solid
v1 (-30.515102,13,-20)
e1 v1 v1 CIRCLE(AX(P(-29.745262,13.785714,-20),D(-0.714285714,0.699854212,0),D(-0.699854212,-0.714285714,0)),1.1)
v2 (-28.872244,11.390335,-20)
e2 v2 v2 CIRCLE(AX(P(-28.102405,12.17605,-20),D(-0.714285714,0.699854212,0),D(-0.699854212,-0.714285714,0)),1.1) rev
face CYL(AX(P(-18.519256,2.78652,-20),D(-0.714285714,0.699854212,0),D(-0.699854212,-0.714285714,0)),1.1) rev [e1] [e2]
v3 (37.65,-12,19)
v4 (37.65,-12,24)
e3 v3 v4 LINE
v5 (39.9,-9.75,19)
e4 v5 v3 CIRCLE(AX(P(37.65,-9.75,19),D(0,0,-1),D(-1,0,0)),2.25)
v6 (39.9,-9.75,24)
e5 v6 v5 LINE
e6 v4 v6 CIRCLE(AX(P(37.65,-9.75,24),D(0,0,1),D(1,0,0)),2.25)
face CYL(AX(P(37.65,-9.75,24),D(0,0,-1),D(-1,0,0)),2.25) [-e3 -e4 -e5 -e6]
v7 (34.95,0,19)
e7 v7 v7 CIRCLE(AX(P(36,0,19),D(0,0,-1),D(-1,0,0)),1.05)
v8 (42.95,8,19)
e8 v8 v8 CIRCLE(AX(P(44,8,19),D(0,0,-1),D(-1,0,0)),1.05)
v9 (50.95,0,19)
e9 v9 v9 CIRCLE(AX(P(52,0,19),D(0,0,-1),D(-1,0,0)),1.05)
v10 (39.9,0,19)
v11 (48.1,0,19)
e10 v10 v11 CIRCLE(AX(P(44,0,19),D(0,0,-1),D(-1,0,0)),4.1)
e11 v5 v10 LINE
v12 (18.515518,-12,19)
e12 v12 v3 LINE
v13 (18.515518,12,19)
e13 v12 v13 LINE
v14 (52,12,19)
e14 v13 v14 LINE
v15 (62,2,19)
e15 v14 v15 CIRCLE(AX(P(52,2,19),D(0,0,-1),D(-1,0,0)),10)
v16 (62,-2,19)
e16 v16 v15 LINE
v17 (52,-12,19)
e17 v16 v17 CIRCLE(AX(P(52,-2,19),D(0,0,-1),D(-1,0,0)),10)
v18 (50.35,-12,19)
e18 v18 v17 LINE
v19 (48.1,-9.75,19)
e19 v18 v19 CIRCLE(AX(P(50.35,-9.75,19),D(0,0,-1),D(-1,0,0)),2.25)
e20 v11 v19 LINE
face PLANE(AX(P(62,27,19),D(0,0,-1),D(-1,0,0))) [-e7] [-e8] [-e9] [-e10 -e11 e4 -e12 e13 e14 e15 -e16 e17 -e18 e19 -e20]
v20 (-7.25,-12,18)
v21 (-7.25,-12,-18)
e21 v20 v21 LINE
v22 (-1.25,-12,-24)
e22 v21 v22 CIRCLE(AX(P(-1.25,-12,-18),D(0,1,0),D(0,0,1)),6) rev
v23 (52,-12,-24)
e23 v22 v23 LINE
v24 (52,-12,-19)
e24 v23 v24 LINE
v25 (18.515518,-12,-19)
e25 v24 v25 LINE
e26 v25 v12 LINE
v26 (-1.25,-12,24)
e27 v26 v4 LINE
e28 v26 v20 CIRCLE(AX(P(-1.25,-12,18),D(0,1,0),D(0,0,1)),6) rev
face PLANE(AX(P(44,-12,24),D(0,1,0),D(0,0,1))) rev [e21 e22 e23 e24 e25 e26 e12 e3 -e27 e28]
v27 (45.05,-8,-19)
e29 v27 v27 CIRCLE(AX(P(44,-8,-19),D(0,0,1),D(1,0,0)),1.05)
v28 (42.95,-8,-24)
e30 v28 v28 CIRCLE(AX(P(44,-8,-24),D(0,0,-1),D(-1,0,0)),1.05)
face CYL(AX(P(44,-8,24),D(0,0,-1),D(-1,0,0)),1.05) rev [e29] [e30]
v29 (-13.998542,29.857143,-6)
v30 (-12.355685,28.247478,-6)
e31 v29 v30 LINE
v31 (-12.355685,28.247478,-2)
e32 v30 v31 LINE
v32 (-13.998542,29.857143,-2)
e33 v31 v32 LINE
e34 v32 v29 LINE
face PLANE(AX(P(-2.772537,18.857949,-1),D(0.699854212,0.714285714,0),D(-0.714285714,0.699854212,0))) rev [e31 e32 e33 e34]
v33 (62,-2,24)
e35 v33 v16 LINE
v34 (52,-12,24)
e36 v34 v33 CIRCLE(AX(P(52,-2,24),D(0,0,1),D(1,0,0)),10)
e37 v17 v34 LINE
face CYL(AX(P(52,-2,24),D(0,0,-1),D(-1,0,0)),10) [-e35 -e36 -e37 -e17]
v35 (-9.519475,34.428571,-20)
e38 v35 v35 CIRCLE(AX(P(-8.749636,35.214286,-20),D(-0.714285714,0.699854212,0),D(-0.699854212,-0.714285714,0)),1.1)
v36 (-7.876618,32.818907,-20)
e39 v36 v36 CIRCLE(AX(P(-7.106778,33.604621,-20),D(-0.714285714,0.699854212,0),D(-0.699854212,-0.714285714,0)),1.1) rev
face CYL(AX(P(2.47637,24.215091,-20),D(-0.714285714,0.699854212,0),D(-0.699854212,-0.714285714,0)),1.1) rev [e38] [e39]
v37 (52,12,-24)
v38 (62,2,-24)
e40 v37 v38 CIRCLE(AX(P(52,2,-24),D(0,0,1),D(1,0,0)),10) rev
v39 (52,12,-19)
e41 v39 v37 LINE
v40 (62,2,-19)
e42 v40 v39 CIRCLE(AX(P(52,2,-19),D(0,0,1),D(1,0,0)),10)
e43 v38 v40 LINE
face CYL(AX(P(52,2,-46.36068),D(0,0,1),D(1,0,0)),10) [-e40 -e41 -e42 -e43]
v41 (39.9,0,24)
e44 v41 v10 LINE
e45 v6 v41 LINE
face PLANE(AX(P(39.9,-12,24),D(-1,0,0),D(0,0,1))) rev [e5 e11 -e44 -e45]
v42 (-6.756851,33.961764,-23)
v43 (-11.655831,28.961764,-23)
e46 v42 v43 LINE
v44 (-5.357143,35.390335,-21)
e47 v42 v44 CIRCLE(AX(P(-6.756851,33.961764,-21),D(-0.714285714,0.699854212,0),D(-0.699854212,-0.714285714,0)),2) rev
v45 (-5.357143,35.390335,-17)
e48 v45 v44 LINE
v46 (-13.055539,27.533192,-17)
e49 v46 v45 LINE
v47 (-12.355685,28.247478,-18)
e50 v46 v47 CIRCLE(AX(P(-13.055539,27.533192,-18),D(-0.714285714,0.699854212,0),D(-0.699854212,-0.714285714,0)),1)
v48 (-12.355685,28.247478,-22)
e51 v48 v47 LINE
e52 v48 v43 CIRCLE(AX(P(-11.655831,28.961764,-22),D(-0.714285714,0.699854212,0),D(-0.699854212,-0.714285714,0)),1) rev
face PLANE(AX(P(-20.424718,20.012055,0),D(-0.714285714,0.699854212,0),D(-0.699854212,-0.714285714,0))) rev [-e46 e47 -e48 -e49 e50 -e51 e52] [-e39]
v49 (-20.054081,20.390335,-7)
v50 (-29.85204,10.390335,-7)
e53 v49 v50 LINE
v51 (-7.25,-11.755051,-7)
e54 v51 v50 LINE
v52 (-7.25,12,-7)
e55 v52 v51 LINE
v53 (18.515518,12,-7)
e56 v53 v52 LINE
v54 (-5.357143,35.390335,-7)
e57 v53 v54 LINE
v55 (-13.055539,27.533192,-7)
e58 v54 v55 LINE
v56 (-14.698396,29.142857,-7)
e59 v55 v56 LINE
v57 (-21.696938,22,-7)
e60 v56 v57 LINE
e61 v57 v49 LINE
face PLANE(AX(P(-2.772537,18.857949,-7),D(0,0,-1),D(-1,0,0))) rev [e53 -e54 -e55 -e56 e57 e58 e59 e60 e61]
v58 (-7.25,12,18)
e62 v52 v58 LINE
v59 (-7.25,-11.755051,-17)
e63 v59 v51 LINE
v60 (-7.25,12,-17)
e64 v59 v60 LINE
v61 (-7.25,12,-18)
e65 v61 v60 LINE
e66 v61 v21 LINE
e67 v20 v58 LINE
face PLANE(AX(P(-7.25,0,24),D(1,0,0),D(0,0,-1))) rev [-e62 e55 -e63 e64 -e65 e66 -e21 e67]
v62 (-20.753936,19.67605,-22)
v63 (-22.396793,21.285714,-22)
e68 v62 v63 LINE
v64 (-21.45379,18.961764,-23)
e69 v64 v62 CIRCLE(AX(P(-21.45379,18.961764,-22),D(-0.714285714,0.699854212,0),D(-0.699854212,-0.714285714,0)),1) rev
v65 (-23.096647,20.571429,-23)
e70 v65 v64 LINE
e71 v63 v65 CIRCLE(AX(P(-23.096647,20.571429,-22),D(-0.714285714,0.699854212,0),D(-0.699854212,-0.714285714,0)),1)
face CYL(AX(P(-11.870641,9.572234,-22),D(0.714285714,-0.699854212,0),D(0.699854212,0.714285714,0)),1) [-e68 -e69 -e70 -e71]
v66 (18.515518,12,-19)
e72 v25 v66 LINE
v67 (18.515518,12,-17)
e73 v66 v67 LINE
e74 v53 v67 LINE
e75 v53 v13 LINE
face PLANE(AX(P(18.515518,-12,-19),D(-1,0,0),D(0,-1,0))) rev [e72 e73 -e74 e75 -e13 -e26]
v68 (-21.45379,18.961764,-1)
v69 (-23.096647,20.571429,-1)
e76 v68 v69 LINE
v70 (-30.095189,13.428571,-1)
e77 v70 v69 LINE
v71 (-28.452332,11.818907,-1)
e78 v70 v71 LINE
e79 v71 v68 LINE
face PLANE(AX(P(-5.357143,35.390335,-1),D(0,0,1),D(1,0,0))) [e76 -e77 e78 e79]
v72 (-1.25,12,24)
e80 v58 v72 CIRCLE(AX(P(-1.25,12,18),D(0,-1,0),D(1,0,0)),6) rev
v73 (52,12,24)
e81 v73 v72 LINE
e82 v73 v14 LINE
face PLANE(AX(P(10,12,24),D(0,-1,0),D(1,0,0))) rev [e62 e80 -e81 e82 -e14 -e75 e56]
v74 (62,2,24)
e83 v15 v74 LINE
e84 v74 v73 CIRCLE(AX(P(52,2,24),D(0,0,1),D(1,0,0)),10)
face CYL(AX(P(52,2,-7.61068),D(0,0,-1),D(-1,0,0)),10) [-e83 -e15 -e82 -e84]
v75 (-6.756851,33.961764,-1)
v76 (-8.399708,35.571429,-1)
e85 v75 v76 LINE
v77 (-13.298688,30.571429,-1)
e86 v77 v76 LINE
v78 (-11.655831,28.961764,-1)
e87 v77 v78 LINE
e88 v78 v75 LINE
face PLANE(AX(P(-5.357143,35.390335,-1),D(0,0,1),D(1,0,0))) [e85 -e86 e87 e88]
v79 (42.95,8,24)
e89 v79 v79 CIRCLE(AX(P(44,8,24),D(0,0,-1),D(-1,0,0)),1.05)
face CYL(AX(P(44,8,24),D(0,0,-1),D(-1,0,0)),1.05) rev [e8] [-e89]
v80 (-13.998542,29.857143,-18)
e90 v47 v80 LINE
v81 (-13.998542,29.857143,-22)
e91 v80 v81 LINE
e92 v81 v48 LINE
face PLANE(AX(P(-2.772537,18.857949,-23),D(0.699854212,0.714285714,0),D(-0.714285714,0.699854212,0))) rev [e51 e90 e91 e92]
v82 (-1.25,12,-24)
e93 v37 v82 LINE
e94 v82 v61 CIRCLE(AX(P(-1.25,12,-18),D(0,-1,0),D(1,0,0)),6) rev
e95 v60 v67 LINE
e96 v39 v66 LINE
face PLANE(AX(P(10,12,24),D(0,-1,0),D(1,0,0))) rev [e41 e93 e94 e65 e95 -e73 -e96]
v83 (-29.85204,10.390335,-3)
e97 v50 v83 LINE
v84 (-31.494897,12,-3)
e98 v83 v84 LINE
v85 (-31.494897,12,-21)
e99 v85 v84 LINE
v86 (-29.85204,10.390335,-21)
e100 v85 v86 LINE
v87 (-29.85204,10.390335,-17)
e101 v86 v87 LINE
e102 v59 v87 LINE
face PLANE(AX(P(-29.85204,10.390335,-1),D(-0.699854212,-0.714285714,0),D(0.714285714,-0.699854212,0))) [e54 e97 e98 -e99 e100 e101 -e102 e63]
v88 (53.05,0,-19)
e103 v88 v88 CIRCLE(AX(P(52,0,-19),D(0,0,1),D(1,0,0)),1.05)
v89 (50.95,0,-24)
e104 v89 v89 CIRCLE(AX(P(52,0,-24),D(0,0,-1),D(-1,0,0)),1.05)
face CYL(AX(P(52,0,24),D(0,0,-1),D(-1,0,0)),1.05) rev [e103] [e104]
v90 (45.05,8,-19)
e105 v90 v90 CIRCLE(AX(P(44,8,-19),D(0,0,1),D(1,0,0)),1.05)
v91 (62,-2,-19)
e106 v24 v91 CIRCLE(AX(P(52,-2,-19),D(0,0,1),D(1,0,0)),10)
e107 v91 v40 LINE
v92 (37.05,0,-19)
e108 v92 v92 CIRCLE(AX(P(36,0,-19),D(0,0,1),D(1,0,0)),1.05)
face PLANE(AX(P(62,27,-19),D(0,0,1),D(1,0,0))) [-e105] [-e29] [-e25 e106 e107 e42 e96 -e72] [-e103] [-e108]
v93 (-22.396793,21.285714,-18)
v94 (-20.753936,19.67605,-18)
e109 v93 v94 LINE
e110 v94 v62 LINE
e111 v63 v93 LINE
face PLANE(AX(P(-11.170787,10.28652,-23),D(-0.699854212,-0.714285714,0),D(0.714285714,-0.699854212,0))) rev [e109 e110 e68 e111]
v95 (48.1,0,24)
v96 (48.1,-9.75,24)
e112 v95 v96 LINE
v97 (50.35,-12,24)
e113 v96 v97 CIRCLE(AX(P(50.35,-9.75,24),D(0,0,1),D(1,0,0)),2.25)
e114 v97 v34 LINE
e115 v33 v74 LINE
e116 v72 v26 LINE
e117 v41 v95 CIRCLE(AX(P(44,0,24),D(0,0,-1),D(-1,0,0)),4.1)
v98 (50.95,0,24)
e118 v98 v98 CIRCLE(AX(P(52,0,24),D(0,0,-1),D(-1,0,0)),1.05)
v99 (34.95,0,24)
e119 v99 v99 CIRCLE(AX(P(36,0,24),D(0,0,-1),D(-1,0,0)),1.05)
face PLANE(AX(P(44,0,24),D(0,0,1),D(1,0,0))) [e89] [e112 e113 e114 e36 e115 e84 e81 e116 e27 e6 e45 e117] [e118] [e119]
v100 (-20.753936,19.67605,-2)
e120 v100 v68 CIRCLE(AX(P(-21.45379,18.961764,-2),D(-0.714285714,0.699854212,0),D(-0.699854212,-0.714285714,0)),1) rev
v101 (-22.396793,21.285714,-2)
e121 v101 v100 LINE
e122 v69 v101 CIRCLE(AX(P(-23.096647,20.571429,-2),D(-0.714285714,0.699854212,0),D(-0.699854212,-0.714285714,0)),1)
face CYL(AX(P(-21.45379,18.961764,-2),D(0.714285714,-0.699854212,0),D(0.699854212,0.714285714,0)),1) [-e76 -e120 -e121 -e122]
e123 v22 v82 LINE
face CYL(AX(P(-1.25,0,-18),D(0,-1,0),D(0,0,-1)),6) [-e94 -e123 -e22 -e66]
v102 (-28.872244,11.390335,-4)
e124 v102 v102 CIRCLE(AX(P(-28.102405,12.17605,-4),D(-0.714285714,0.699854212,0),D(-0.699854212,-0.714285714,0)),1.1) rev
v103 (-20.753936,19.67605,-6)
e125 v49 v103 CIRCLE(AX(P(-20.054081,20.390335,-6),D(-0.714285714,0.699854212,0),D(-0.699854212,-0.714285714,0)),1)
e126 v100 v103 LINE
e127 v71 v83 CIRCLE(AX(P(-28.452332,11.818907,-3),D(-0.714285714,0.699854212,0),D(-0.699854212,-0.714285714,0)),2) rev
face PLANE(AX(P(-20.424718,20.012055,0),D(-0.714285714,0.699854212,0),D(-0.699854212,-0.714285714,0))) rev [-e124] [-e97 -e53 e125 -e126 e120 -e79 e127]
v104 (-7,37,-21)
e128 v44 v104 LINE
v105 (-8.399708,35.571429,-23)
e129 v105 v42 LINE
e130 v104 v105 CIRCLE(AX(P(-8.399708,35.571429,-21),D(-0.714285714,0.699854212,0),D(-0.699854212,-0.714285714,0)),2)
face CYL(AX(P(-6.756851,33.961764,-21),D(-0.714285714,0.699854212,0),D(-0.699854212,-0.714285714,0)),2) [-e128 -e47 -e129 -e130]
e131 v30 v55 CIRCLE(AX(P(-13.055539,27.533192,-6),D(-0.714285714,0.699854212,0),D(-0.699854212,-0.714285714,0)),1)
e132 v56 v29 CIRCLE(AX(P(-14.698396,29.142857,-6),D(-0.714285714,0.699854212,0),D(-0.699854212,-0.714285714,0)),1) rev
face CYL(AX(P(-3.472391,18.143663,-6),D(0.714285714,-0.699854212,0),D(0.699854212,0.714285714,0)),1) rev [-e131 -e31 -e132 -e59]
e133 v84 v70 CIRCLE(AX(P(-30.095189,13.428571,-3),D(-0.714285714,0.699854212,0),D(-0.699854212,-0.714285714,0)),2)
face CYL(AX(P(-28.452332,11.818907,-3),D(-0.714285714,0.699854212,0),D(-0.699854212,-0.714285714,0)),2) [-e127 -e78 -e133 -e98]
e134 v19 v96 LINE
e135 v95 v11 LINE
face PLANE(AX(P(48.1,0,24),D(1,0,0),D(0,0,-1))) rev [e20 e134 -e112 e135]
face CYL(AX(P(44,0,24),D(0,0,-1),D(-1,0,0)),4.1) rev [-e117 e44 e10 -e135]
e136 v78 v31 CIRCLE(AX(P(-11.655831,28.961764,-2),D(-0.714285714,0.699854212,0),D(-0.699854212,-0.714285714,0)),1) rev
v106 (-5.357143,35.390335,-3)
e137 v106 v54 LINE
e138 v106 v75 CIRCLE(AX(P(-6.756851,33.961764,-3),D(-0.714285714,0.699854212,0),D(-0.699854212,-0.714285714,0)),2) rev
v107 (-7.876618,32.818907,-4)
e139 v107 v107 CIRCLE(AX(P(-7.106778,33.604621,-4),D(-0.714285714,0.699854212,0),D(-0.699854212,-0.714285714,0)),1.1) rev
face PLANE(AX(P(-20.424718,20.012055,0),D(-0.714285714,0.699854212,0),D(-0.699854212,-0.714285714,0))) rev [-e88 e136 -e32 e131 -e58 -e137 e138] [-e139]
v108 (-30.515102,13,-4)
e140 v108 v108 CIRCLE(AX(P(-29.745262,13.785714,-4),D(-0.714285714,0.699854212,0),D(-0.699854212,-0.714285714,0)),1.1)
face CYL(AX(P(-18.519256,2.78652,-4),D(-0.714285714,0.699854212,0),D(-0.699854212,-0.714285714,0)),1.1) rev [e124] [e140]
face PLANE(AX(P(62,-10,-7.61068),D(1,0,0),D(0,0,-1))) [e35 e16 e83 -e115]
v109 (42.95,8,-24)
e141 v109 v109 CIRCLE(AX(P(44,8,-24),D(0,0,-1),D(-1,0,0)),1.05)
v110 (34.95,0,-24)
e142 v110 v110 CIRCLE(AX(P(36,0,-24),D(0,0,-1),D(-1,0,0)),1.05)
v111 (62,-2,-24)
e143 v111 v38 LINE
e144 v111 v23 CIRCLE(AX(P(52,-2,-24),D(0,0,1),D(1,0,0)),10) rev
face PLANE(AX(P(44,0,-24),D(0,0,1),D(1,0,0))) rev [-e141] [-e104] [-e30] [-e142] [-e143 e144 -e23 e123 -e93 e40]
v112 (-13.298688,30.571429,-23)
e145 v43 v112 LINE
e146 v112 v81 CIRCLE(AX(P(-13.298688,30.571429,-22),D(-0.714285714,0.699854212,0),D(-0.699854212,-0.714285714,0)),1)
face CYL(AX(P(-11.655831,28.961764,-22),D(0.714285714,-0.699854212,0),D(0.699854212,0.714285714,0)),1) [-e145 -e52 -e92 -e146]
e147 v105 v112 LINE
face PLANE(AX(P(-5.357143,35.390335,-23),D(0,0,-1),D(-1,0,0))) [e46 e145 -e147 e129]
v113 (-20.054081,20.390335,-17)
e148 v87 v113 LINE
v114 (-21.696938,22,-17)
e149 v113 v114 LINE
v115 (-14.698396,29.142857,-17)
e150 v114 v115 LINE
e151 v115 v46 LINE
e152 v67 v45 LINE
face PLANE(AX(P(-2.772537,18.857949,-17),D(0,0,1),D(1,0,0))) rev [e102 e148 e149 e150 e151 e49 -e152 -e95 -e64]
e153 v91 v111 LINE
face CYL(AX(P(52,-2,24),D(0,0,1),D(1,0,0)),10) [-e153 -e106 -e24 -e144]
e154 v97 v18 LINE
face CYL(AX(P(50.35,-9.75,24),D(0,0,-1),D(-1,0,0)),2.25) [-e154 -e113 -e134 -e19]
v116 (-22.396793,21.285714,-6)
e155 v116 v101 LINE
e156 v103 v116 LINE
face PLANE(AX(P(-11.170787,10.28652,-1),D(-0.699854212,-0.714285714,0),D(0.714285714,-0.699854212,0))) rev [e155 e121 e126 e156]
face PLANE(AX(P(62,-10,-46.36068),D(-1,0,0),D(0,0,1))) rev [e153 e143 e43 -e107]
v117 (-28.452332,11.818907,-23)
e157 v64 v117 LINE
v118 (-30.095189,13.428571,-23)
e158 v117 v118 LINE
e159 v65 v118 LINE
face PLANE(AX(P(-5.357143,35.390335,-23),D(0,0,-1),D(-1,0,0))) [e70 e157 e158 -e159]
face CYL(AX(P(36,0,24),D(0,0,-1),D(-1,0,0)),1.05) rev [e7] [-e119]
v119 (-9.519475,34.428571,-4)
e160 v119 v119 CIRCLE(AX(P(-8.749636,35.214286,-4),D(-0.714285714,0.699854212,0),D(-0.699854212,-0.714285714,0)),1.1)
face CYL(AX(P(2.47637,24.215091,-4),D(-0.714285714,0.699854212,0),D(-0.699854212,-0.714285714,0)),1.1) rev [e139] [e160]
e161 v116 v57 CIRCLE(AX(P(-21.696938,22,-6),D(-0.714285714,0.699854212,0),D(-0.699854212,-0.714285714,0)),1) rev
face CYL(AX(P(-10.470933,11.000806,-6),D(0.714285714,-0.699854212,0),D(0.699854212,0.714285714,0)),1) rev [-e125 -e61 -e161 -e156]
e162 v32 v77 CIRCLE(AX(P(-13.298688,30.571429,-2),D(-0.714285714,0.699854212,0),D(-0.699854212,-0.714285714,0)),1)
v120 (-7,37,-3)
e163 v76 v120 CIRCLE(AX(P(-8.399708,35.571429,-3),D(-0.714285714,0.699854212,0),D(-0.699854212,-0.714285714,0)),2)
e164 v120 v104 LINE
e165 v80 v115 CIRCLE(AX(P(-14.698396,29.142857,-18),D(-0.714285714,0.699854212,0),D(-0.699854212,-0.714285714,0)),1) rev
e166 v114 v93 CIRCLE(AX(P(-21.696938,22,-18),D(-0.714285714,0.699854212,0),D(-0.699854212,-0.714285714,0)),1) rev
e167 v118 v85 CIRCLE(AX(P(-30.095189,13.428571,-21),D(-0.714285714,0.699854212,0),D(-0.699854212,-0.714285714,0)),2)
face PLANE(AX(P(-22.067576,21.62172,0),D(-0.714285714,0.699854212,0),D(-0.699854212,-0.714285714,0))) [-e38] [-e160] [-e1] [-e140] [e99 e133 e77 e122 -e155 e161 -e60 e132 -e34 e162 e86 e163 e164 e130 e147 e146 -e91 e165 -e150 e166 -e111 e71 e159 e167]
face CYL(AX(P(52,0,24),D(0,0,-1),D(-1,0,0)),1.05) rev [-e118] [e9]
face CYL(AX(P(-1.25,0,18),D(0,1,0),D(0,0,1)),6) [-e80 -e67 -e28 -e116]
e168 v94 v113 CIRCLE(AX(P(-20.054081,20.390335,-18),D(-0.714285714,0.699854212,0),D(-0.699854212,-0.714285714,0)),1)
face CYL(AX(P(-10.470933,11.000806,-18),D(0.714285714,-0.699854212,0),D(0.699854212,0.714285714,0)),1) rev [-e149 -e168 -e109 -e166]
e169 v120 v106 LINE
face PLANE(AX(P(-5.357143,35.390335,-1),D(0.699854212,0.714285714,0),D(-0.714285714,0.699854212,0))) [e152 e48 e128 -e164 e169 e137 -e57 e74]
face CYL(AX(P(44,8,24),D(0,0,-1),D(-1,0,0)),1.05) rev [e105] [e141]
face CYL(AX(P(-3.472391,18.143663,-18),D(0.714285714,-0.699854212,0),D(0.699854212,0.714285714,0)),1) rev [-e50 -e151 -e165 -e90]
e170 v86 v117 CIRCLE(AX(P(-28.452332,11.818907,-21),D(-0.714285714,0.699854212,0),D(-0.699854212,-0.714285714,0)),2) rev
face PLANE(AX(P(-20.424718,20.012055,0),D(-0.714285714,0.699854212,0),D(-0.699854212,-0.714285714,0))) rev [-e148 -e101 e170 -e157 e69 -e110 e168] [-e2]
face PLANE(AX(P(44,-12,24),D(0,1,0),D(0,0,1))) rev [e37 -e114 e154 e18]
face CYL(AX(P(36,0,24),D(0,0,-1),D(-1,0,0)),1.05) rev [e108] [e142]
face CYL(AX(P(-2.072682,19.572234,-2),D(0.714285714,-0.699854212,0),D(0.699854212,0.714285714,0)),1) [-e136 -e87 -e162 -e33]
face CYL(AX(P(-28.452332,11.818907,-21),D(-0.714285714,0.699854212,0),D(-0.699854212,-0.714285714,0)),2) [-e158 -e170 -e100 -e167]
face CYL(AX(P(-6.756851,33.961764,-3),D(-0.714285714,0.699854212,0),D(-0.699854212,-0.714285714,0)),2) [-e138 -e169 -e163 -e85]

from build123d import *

# Parameters (mm, degrees)
EXTRUDE_1_DEPTH         = 24
SKETCH_2_W              = 24
SKETCH_2_H              = 29.5
CUT_EXTRUDE_1_DEPTH     = 79.714674617
SKETCH_3_R              = 1.1
CUT_EXTRUDE_2_DEPTH     = 96.205041883
SKETCH_4_W              = 15
SKETCH_4_H              = 48
EXTRUDE_2_DEPTH         = 52
SKETCH_5_W              = 35
SKETCH_5_H              = 13
CUT_EXTRUDE_3_DEPTH     = 52
SKETCH_6_W              = 35
SKETCH_6_H              = 20.5
CUT_EXTRUDE_4_DEPTH     = 11.5
SKETCH_7_W              = 35
SKETCH_7_H              = 19
CUT_EXTRUDE_5_DEPTH     = 37.5
SKETCH_8_R              = 1.1
CUT_EXTRUDE_6_DEPTH     = 3
CUT_EXTRUDE_7_DEPTH     = 96.205041883
SKETCH_10_W             = 35
SKETCH_10_H             = 22
CUT_EXTRUDE_8_DEPTH     = 11.5
SKETCH_11_W             = 12
SKETCH_11_H             = 6
CUT_EXTRUDE_9_DEPTH     = 3
FILLET_1_R              = 2
FILLET_2_R              = 1
SKETCH_14_R             = 0.75
CUT_EXTRUDE_12_DEPTH    = 8
SKETCH_17_R             = 1.9
CUT_EXTRUDE_13_DEPTH    = 1.4
SKETCH_26_W             = 65.219467354
SKETCH_26_H             = 31.879169378
CUT_EXTRUDE_17_DEPTH    = 2.75
CUT_EXTRUDE_18_DEPTH    = 0.7
SKETCH_28_R             = 4.45
EXTRUDE_11_DEPTH        = 8
EXTRUDE_12_REACH        = 89.179
SKETCH_29_W             = 35
SKETCH_29_H             = 48
SKETCH4_R               = 1.9
CUT_EXTRUDE3_DEPTH      = 1
BOSS_EXTRUDE2_DEPTH     = 9.25
CUT_EXTRUDE4_START      = -17.25
CUT_EXTRUDE4_DEPTH      = 8
BOSS_EXTRUDE3_START     = 29.5
BOSS_EXTRUDE3_DEPTH     = 9.25
CUT_EXTRUDE5_START      = 38.75
CUT_EXTRUDE5_DEPTH      = 49.724639182
SKETCH6_W               = 10
SKETCH6_H               = 20
BOSS_EXTRUDE4_DEPTH     = 9.25
BOSS_EXTRUDE5_START     = -38.75
SKETCH6_2_W             = 10
SKETCH6_2_H             = 20
BOSS_EXTRUDE5_DEPTH     = 9.25
MOVE_FACE1_BY           = 2
MOVE_FACE2_BY           = 2
MOVE_FACE3_BY           = 8
MOVE_FACE3_2_BY         = 8
CUT_EXTRUDE6_DEPTH      = 15
CUT_EXTRUDE6_DEPTH_BACK = 77.826102335
SKETCH7_W               = 37.75
SKETCH7_H               = 38
SKETCH8_R               = 1.05
CUT_EXTRUDE7_DEPTH      = 94.264409074
CUT_EXTRUDE8_DEPTH      = 91.792345492
FILLET1_R               = 10
FILLET2_R               = 2.25
FILLET3_R               = 1.75
SKETCH16_W              = 35
SKETCH16_H              = 22
BOSS_EXTRUDE6_DEPTH     = 2.3
FILLET5_R               = 2
SKETCH21_R              = 1.1
SKETCH21_W              = 6
SKETCH21_H              = 12
CUT_EXTRUDE10_DEPTH     = 2.3
FILLET6_R               = 1
SKETCH25_W              = 30.257186082
SKETCH25_H              = 41.144662004
CUT_EXTRUDE11_DEPTH     = 90.00456449
BOSS_EXTRUDE7_REACH     = 93.622
SKETCH26_W              = 10
SKETCH26_H              = 35
SKETCH27_W              = 33.484481846
SKETCH27_H              = 38
CUT_EXTRUDE12_DEPTH     = 72.028163428
FILLET7_R               = 6


with BuildPart() as part:
    # 草图1 → 凸台-拉伸1 (new, symmetric)
    with BuildSketch(Plane.XY):
        with BuildLine():
            Line((10, 10), (44, 10))
            ThreePointArc((44, 10), (54, 0), (44, -10))
            Line((44, -10), (0, -10))
            Line((0, -10), (-10, -10))
            Line((-10, -10), (-10, 0))
            Line((-10, 0), (-10, 62))
            Line((-10, 62), (10, 62))
            Line((10, 62), (10, 10))
        make_face()
    extrude(amount=EXTRUDE_1_DEPTH, both=True)

    # 草图2 → 切除-拉伸1 (cut, through all)
    with BuildSketch(Plane(origin=(0, 10, 0), x_dir=(1, 0, 0), z_dir=(0, 1, 0))):
        with Locations((42, 0)):
            Rectangle(SKETCH_2_W, SKETCH_2_H)
    extrude(amount=-CUT_EXTRUDE_1_DEPTH, mode=Mode.SUBTRACT)

    # 草图3 → 切除-拉伸2 (cut, through all)
    with BuildSketch(Plane.XY.offset(24)):
        with Locations((44, 6)):
            Circle(SKETCH_3_R)
        with Locations((50, 0)):
            Circle(SKETCH_3_R)
        with Locations((44, -6)):
            Circle(SKETCH_3_R)
        with Locations((38, 0)):
            Circle(SKETCH_3_R)
    extrude(amount=-CUT_EXTRUDE_2_DEPTH, mode=Mode.SUBTRACT)

    # 草图4 → 凸台-拉伸2 (add, through all)
    with BuildSketch(Plane(origin=(0, 10, 0), x_dir=(1, 0, 0), z_dir=(0, 1, 0))):
        with Locations((17.5, 0)):
            Rectangle(SKETCH_4_W, SKETCH_4_H)
    extrude(amount=EXTRUDE_2_DEPTH)

    # 草图5 → 切除-拉伸3 (cut)
    with BuildSketch(Plane(origin=(0, 62, 0), x_dir=(1, 0, 0), z_dir=(0, 1, 0))):
        with Locations((7.5, -17.5)):
            Rectangle(SKETCH_5_W, SKETCH_5_H)
        with Locations((7.5, 17.5)):
            Rectangle(SKETCH_5_W, SKETCH_5_H)
    extrude(amount=-CUT_EXTRUDE_3_DEPTH, mode=Mode.SUBTRACT)

    # 草图6 → 切除-拉伸4 (cut)
    with BuildSketch(Plane(origin=(0, 62, 0), x_dir=(1, 0, 0), z_dir=(0, 1, 0))):
        with Locations((7.5, 0)):
            Rectangle(SKETCH_6_W, SKETCH_6_H)
    extrude(amount=-CUT_EXTRUDE_4_DEPTH, mode=Mode.SUBTRACT)

    # 草图7 → 切除-拉伸5 (cut)
    with BuildSketch(Plane(origin=(0, 10, 0), x_dir=(1, 0, 0), z_dir=(0, 1, 0))):
        with Locations((7.5, 14.5)):
            Rectangle(SKETCH_7_W, SKETCH_7_H)
        with Locations((7.5, -14.5)):
            Rectangle(SKETCH_7_W, SKETCH_7_H)
    extrude(amount=CUT_EXTRUDE_5_DEPTH, mode=Mode.SUBTRACT)

    # 草图8 → 切除-拉伸6 (cut)
    with BuildSketch(Plane(origin=(0, 50.5, 0), x_dir=(1, 0, 0), z_dir=(0, 1, 0))):
        with Locations(Location((-7.5, 8, 0), (0, 0, 270))):
            Circle(SKETCH_8_R)
        with Locations(Location((22.5, 8, 0), (0, 0, 270))):
            Circle(SKETCH_8_R)
        with Locations(Location((22.5, -8, 0), (0, 0, 270))):
            Circle(SKETCH_8_R)
        with Locations(Location((-7.5, -8, 0), (0, 0, 270))):
            Circle(SKETCH_8_R)
    extrude(amount=-CUT_EXTRUDE_6_DEPTH, mode=Mode.SUBTRACT)

    # 草图9 → 切除-拉伸7 (cut, through all)
    with BuildSketch(Plane.XY.offset(24)):
        Polygon((-10, 4), (25, -10), (-10, -10), align=None)
    extrude(amount=-CUT_EXTRUDE_7_DEPTH, mode=Mode.SUBTRACT)

    # 草图10 → 切除-拉伸8 (cut)
    with BuildSketch(Plane(origin=(0, 62, 0), x_dir=(1, 0, 0), z_dir=(0, 1, 0))):
        with Locations((7.5, 0)):
            Rectangle(SKETCH_10_W, SKETCH_10_H)
    extrude(amount=-CUT_EXTRUDE_8_DEPTH, mode=Mode.SUBTRACT)

    # 草图11 → 切除-拉伸9 (cut)
    with BuildSketch(Plane(origin=(0, 50.5, 0), x_dir=(1, 0, 0), z_dir=(0, 1, 0))):
        with Locations((9, -8)):
            Rectangle(SKETCH_11_W, SKETCH_11_H)
        with Locations((9, 8)):
            Rectangle(SKETCH_11_W, SKETCH_11_H)
    extrude(amount=-CUT_EXTRUDE_9_DEPTH, mode=Mode.SUBTRACT)

    # 圆角1
    fillet_1_edges = [part.edges().sort_by_distance(p)[0] for p in [
        (-10, 49, -11),
        (25, 49, -11),
        (25, 49, 11),
        (-10, 49, 11),
    ]]
    fillet(fillet_1_edges, radius=FILLET_1_R)

    # 圆角2
    fillet_2_edges = [part.edges().sort_by_distance(p)[0] for p in [
        (3, 49, 11),
        (3, 49, 5),
        (15, 49, 5),
        (15, 49, 11),
        (3, 49, -11),
        (15, 49, -11),
        (15, 49, -5),
        (3, 49, -5),
    ]]
    fillet(fillet_2_edges, radius=FILLET_2_R)

    # 草图14 → 切除-拉伸12 (cut)
    with BuildSketch(Plane.XY.offset(24)):
        with Locations((12, 7)):
            Circle(SKETCH_14_R)
        with Locations((26, 7)):
            Circle(SKETCH_14_R)
    extrude(amount=-CUT_EXTRUDE_12_DEPTH, mode=Mode.SUBTRACT)

    # 草图17 → 切除-拉伸13 (cut)
    with BuildSketch(Plane.XY.offset(24)):
        with Locations((44, 6)):
            Circle(SKETCH_17_R)
        with Locations((50, 0)):
            Circle(SKETCH_17_R)
        with Locations((44, -6)):
            Circle(SKETCH_17_R)
        with Locations((38, 0)):
            Circle(SKETCH_17_R)
    extrude(amount=-CUT_EXTRUDE_13_DEPTH, mode=Mode.SUBTRACT)

    # 草图26 → 切除-拉伸17 (cut)
    with BuildSketch(Plane(origin=(30, 0, 0), x_dir=(0, 0, -1), z_dir=(1, 0, 0))):
        with Locations((0, -0.918796831)):
            Rectangle(SKETCH_26_W, SKETCH_26_H)
    extrude(amount=-CUT_EXTRUDE_17_DEPTH, mode=Mode.SUBTRACT)


with BuildPart() as cut_extrude_17_piece_1:
    # of the separate pieces the step leaves, piece 1, a body of its own (cut_extrude_17_pieces)
    add(part.part.solids().sort_by_distance((2, 47.5, -11))[0])


with BuildPart() as cut_extrude_17_piece_2:
    # of the separate pieces the step leaves, piece 2, a body of its own (cut_extrude_17_pieces)
    add(part.part.solids().sort_by_distance((44, 10, -24))[0])


with BuildPart() as cut_extrude_17_piece_3:
    # of the separate pieces the step leaves, piece 3, a body of its own (cut_extrude_17_pieces)
    add(part.part.solids().sort_by_distance((30, 10, 24))[0])


with BuildPart() as cut_extrude_17_piece_1_1:
    # Move Body 1: moved
    add(cut_extrude_17_piece_1.part.moved(Location((2.75, 0, 0))))


with BuildPart() as cut_extrude_17_piece_2_1:
    add(cut_extrude_17_piece_2.part)

    # Combine 1: union 切除-拉伸17 piece 3, 切除-拉伸17 piece 1
    add(cut_extrude_17_piece_3.part)
    add(cut_extrude_17_piece_1_1.part)

    # 草图27 → 切除-拉伸18 (cut)
    with BuildSketch(Plane.XZ.offset(-47.5)):
        with BuildLine():
            Line((25.75, 11), (18.75, 11))
            ThreePointArc((18.75, 11), (18.042893219, 10.707106781), (17.75, 10))
            Line((17.75, 10), (17.75, 6))
            ThreePointArc((17.75, 6), (17.457106781, 5.292893219), (16.75, 5))
            Line((16.75, 5), (27.75, 5))
            Line((27.75, 5), (27.75, 9))
            ThreePointArc((27.75, 9), (27.164213562, 10.414213562), (25.75, 11))
        make_face()
        with BuildLine():
            Line((5.75, 6), (5.75, 10))
            ThreePointArc((5.75, 10), (5.457106781, 10.707106781), (4.75, 11))
            Line((4.75, 11), (-5.25, 11))
            ThreePointArc((-5.25, 11), (-6.664213562, 10.414213562), (-7.25, 9))
            Line((-7.25, 9), (-7.25, 5))
            Line((-7.25, 5), (6.75, 5))
            ThreePointArc((6.75, 5), (6.042893219, 5.292893219), (5.75, 6))
        make_face()
        with BuildLine():
            Line((-5.25, -11), (4.75, -11))
            ThreePointArc((4.75, -11), (5.457106781, -10.707106781), (5.75, -10))
            Line((5.75, -10), (5.75, -6))
            ThreePointArc((5.75, -6), (6.042893219, -5.292893219), (6.75, -5))
            Line((6.75, -5), (-7.25, -5))
            Line((-7.25, -5), (-7.25, -9))
            ThreePointArc((-7.25, -9), (-6.664213562, -10.414213562), (-5.25, -11))
        make_face()
        with BuildLine():
            Line((17.75, -6), (17.75, -10))
            ThreePointArc((17.75, -10), (18.042893219, -10.707106781), (18.75, -11))
            Line((18.75, -11), (25.75, -11))
            ThreePointArc((25.75, -11), (27.164213562, -10.414213562), (27.75, -9))
            Line((27.75, -9), (27.75, -5))
            Line((27.75, -5), (16.75, -5))
            ThreePointArc((16.75, -5), (17.457106781, -5.292893219), (17.75, -6))
        make_face()
    extrude(amount=-CUT_EXTRUDE_18_DEPTH, mode=Mode.SUBTRACT)

    # 草图28 → 凸台-拉伸11 (add)
    with BuildSketch(Plane.XY.offset(24)):
        with Locations(Location((44, 0, 0), (0, 0, 167.792342))):
            Circle(SKETCH_28_R)
    extrude(amount=EXTRUDE_11_DEPTH)

    # 凸台-拉伸12: up to this face of the body (flat: up to its plane)
    extrude_12_end = Plane(cut_extrude_17_piece_2_1.part.faces().sort_by_distance((10.25, -3, 0))[0])
    # 草图29 → 凸台-拉伸12 (add, up to the picked face)
    with BuildSketch(Plane.XZ.offset(10), mode=Mode.PRIVATE) as extrude_12_sk1:
        with Locations((10.25, 0)):
            Rectangle(SKETCH_29_W, SKETCH_29_H)
    extrude_12_tool1 = split(extrude(extrude_12_sk1.sketch, amount=-EXTRUDE_12_REACH, mode=Mode.PRIVATE), bisect_by=extrude_12_end, keep=Keep.BOTH, mode=Mode.PRIVATE)
    add(extrude_12_tool1.solids().sort_by(Axis((10.25, -10, 0), (0, 1, 0)))[0])

    # Mirror12: 切除-拉伸17 piece 2 across plane


with BuildPart() as cut_extrude_17_piece_2_2:
    add(cut_extrude_17_piece_2_1.part)
    add(cut_extrude_17_piece_2_1.part.mirror(Plane.XY))

    # Sketch4 → Cut-Extrude3 (cut)
    with BuildSketch(Plane.XY.offset(24)):
        with Locations((38, 0)):
            Circle(SKETCH4_R)
        with Locations((44, -6)):
            Circle(SKETCH4_R)
        with Locations((50, 0)):
            Circle(SKETCH4_R)
        with Locations((44, 6)):
            Circle(SKETCH4_R)
    cut_extrude3 = extrude(amount=-CUT_EXTRUDE3_DEPTH, mode=Mode.SUBTRACT)

    # Mirror13: Cut-Extrude3 across plane
    add(cut_extrude3.mirror(Plane.XY), mode=Mode.SUBTRACT)

    # Sketch5 → Boss-Extrude2 (add)
    with BuildSketch(Plane(origin=(0, 0, 14.75), x_dir=(-1, 0, 0), z_dir=(0, 0, -1))):
        with BuildLine():
            Line((-44, -10), (-30, -10))
            Line((-30, -10), (-30, 10))
            Line((-30, 10), (-44, 10))
            ThreePointArc((-44, 10), (-54, 0), (-44, -10))
        make_face()
    extrude(amount=-BOSS_EXTRUDE2_DEPTH)

    # Sketch5<2> → Cut-Extrude4 (cut)
    with BuildSketch(Plane(origin=(0, 0, 14.75), x_dir=(-1, 0, 0), z_dir=(0, 0, -1)).offset(CUT_EXTRUDE4_START)):
        with BuildLine():
            Line((-44, -10), (-30, -10))
            Line((-30, -10), (-30, 10))
            Line((-30, 10), (-44, 10))
            ThreePointArc((-44, 10), (-54, 0), (-44, -10))
        make_face()
    extrude(amount=CUT_EXTRUDE4_DEPTH, mode=Mode.SUBTRACT)

    # Sketch5<3> → Boss-Extrude3 (add)
    with BuildSketch(Plane(origin=(0, 0, 14.75), x_dir=(-1, 0, 0), z_dir=(0, 0, -1)).offset(BOSS_EXTRUDE3_START)):
        with BuildLine():
            Line((-44, -10), (-30, -10))
            Line((-30, -10), (-30, 10))
            Line((-30, 10), (-44, 10))
            ThreePointArc((-44, 10), (-54, 0), (-44, -10))
        make_face()
    extrude(amount=BOSS_EXTRUDE3_DEPTH)

    # Sketch5<4> → Cut-Extrude5 (cut, through all)
    with BuildSketch(Plane(origin=(0, 0, 14.75), x_dir=(-1, 0, 0), z_dir=(0, 0, -1)).offset(CUT_EXTRUDE5_START)):
        with BuildLine():
            Line((-44, -10), (-30, -10))
            Line((-30, -10), (-30, 10))
            Line((-30, 10), (-44, 10))
            ThreePointArc((-44, 10), (-54, 0), (-44, -10))
        make_face()
    extrude(amount=CUT_EXTRUDE5_DEPTH, mode=Mode.SUBTRACT)

    # Sketch6 → Boss-Extrude4 (add)
    with BuildSketch(Plane.XY.offset(24)):
        with Locations((49, 0)):
            Rectangle(SKETCH6_W, SKETCH6_H)
    extrude(amount=-BOSS_EXTRUDE4_DEPTH)

    # Sketch6<2> → Boss-Extrude5 (add)
    with BuildSketch(Plane.XY.offset(24).offset(BOSS_EXTRUDE5_START)):
        with Locations((49, 0)):
            Rectangle(SKETCH6_2_W, SKETCH6_2_H)
    extrude(amount=-BOSS_EXTRUDE5_DEPTH)

    # Move Face1: a face moved outward by 2.0
    extrude(cut_extrude_17_piece_2_2.faces().sort_by_distance((23.375, 10, -12))[0], amount=MOVE_FACE1_BY, dir=(0, 1, 0))

    # Move Face2: a face moved outward by 2.0
    extrude(cut_extrude_17_piece_2_2.faces().sort_by_distance((17.467069892, -10, 0))[0], amount=MOVE_FACE2_BY, dir=(0, -1, 0))

    # Move Face3: a face moved outward by 8.0
    extrude(cut_extrude_17_piece_2_2.faces().sort_by_distance((54, 0, 19.375))[0], amount=MOVE_FACE3_BY, dir=(1, 0, 0))

    # Move Face3 2: a face moved outward by 8.0
    extrude(cut_extrude_17_piece_2_2.faces().sort_by_distance((54, 0, -19.375))[0], amount=MOVE_FACE3_2_BY, dir=(1, 0, 0))

    # Sketch7 → Cut-Extrude6 (cut, two sides: drawn at the far end of the back side and taken through both)
    with BuildSketch(Plane(origin=(0, 12, 0), x_dir=(1, 0, 0), z_dir=(0, 1, 0)).offset(-CUT_EXTRUDE6_DEPTH_BACK)):
        with Locations((43.125, 0)):
            Rectangle(SKETCH7_W, SKETCH7_H)
    extrude(amount=CUT_EXTRUDE6_DEPTH + CUT_EXTRUDE6_DEPTH_BACK, mode=Mode.SUBTRACT)

    # Sketch8 → Cut-Extrude7 (cut, through all)
    with BuildSketch(Plane(origin=(0, 0, -24), x_dir=(-1, 0, 0), z_dir=(0, 0, -1))):
        with Locations((-44, 8)):
            Circle(SKETCH8_R)
        with Locations((-36, 0)):
            Circle(SKETCH8_R)
        with Locations((-44, -8)):
            Circle(SKETCH8_R)
        with Locations((-52, 0)):
            Circle(SKETCH8_R)
    extrude(amount=-CUT_EXTRUDE7_DEPTH, mode=Mode.SUBTRACT)

    # Sketch9 → Cut-Extrude8 (cut, through all)
    with BuildSketch(Plane(origin=(0, 0, 19), x_dir=(-1, 0, 0), z_dir=(0, 0, -1))):
        with BuildLine():
            Line((-48.1, 0), (-48.1, -12))
            Line((-48.1, -12), (-39.9, -12))
            Line((-39.9, -12), (-39.9, 0))
            ThreePointArc((-39.9, 0), (-44, 4.1), (-48.1, 0))
        make_face()
    extrude(amount=-CUT_EXTRUDE8_DEPTH, mode=Mode.SUBTRACT)

    # Fillet1
    fillet1_edges = [cut_extrude_17_piece_2_2.edges().sort_by_distance(p)[0] for p in [
        (62, 12, -21.5),
        (62, -12, -21.5),
        (62, -12, 21.5),
        (62, 12, 21.5),
    ]]
    fillet(fillet1_edges, radius=FILLET1_R)

    # Fillet2
    fillet2_edges = [cut_extrude_17_piece_2_2.edges().sort_by_distance(p)[0] for p in [
        (39.9, -12, 21.5),
        (48.1, -12, 21.5),
    ]]
    fillet(fillet2_edges, radius=FILLET2_R)

    # Fillet3
    fillet3_edges = [cut_extrude_17_piece_2_2.edges().sort_by_distance(p)[0] for p in [
        (24.25, 27, 0),
    ]]
    fillet(fillet3_edges, radius=FILLET3_R)
    fillet3_2_edges = [cut_extrude_17_piece_2_2.edges().sort_by_distance(p)[0] for p in [
        (27.75, 27, 0),
    ]]
    fillet(fillet3_2_edges, radius=FILLET3_R - 0.0001)  # a hair under: the kernel refuses the full size

    # Sketch25 → Cut-Extrude11 (cut, through all)
    with BuildSketch(Plane.ZY.offset(7.25)):
        with Locations((0.164418045, 32.572331002)):
            Rectangle(SKETCH25_W, SKETCH25_H)
    extrude(amount=-CUT_EXTRUDE11_DEPTH, mode=Mode.SUBTRACT)



with BuildPart() as body_2:
    # Sketch16 → Boss-Extrude6 (new body)
    with BuildSketch(Plane(origin=(-22.067575609, 21.621720041, 0), x_dir=(-0.6998542122237652, -0.7142857142857143, 0), z_dir=(-0.7142857142857143, 0.6998542122237652, 0))):
        with Locations((-4.029591943, -12)):
            Rectangle(SKETCH16_W, SKETCH16_H)
    extrude(amount=-BOSS_EXTRUDE6_DEPTH)

    # Fillet5
    fillet5_edges = [body_2.edges().sort_by_distance(p)[0] for p in [
        (-6.178571429, 36.195167656, -1),
        (-30.673468856, 11.195167656, -1),
        (-30.673468856, 11.195167656, -23),
        (-6.178571429, 36.195167656, -23),
    ]]
    fillet(fillet5_edges, radius=FILLET5_R)

    # Sketch21 → Cut-Extrude10 (cut)
    with BuildSketch(Plane(origin=(-22.067575609, 21.621720041, 0), x_dir=(0, 0, 1), z_dir=(-0.7142857142857142, 0.6998542122237652, 0))):
        with Locations(Location((-20, 19.029591943, 0), (0, 0, 270))):
            Circle(SKETCH21_R)
        with Locations(Location((-4, 19.029591943, 0), (0, 0, 270))):
            Circle(SKETCH21_R)
        with Locations(Location((-4, -10.970408057, 0), (0, 0, 270))):
            Circle(SKETCH21_R)
        with Locations(Location((-20, -10.970408057, 0), (0, 0, 270))):
            Circle(SKETCH21_R)
        with Locations((-20, 5.529591943)):
            Rectangle(SKETCH21_W, SKETCH21_H)
        with Locations((-4, 5.529591943)):
            Rectangle(SKETCH21_W, SKETCH21_H)
    extrude(amount=-CUT_EXTRUDE10_DEPTH, mode=Mode.SUBTRACT)

    # Fillet6
    fillet6_edges = [body_2.edges().sort_by_distance(p)[0] for p in [
        (-13.177113551, 29.052310513, -1),
        (-21.575364097, 20.480881942, -1),
        (-21.575364097, 20.480881942, -7),
        (-13.177113551, 29.052310513, -7),
        (-21.575364097, 20.480881942, -23),
        (-13.177113551, 29.052310513, -23),
        (-13.177113551, 29.052310513, -17),
        (-21.575364097, 20.480881942, -17),
    ]]
    fillet(fillet6_edges, radius=FILLET6_R)


with BuildPart() as cut_extrude_17_piece_2_3:
    add(cut_extrude_17_piece_2_2.part)

    add(body_2.part)  # Boss-Extrude7 merges body 2
    # Boss-Extrude7: up to this plane
    boss_extrude7_end = Plane(origin=(44, -12, 24), z_dir=(0, 1, 0))
    # Sketch26 → Boss-Extrude7 (add, up to the surface)
    with BuildSketch(Plane(origin=(-20.424718466, 20.012055353, 0), x_dir=(0, 0, -1), z_dir=(0.7142857142857142, -0.6998542122237652, 0)), mode=Mode.PRIVATE) as boss_extrude7_sk1:
        with Locations((12, 4.029591943)):
            Rectangle(SKETCH26_W, SKETCH26_H)
    boss_extrude7_tool1 = split(extrude(boss_extrude7_sk1.sketch, amount=BOSS_EXTRUDE7_REACH, mode=Mode.PRIVATE), bisect_by=boss_extrude7_end, keep=Keep.BOTH, mode=Mode.PRIVATE)
    add(boss_extrude7_tool1.solids().sort_by_distance((-17.604592, 22.890335, -12))[0])

    # Sketch27 → Cut-Extrude12 (cut, through all)
    with BuildSketch(Plane(origin=(0, 12, 0), x_dir=(1, 0, 0), z_dir=(0, 1, 0))):
        with Locations((35.257759077, 0)):
            Rectangle(SKETCH27_W, SKETCH27_H)
    extrude(amount=-CUT_EXTRUDE12_DEPTH, mode=Mode.SUBTRACT)

    # Fillet7
    fillet7_edges = [cut_extrude_17_piece_2_3.edges().sort_by_distance(p)[0] for p in [
        (-7.25, 0, -24),
        (-7.25, 0, 24),
    ]]
    fillet(fillet7_edges, radius=FILLET7_R)


solid = cut_extrude_17_piece_2_3.part
